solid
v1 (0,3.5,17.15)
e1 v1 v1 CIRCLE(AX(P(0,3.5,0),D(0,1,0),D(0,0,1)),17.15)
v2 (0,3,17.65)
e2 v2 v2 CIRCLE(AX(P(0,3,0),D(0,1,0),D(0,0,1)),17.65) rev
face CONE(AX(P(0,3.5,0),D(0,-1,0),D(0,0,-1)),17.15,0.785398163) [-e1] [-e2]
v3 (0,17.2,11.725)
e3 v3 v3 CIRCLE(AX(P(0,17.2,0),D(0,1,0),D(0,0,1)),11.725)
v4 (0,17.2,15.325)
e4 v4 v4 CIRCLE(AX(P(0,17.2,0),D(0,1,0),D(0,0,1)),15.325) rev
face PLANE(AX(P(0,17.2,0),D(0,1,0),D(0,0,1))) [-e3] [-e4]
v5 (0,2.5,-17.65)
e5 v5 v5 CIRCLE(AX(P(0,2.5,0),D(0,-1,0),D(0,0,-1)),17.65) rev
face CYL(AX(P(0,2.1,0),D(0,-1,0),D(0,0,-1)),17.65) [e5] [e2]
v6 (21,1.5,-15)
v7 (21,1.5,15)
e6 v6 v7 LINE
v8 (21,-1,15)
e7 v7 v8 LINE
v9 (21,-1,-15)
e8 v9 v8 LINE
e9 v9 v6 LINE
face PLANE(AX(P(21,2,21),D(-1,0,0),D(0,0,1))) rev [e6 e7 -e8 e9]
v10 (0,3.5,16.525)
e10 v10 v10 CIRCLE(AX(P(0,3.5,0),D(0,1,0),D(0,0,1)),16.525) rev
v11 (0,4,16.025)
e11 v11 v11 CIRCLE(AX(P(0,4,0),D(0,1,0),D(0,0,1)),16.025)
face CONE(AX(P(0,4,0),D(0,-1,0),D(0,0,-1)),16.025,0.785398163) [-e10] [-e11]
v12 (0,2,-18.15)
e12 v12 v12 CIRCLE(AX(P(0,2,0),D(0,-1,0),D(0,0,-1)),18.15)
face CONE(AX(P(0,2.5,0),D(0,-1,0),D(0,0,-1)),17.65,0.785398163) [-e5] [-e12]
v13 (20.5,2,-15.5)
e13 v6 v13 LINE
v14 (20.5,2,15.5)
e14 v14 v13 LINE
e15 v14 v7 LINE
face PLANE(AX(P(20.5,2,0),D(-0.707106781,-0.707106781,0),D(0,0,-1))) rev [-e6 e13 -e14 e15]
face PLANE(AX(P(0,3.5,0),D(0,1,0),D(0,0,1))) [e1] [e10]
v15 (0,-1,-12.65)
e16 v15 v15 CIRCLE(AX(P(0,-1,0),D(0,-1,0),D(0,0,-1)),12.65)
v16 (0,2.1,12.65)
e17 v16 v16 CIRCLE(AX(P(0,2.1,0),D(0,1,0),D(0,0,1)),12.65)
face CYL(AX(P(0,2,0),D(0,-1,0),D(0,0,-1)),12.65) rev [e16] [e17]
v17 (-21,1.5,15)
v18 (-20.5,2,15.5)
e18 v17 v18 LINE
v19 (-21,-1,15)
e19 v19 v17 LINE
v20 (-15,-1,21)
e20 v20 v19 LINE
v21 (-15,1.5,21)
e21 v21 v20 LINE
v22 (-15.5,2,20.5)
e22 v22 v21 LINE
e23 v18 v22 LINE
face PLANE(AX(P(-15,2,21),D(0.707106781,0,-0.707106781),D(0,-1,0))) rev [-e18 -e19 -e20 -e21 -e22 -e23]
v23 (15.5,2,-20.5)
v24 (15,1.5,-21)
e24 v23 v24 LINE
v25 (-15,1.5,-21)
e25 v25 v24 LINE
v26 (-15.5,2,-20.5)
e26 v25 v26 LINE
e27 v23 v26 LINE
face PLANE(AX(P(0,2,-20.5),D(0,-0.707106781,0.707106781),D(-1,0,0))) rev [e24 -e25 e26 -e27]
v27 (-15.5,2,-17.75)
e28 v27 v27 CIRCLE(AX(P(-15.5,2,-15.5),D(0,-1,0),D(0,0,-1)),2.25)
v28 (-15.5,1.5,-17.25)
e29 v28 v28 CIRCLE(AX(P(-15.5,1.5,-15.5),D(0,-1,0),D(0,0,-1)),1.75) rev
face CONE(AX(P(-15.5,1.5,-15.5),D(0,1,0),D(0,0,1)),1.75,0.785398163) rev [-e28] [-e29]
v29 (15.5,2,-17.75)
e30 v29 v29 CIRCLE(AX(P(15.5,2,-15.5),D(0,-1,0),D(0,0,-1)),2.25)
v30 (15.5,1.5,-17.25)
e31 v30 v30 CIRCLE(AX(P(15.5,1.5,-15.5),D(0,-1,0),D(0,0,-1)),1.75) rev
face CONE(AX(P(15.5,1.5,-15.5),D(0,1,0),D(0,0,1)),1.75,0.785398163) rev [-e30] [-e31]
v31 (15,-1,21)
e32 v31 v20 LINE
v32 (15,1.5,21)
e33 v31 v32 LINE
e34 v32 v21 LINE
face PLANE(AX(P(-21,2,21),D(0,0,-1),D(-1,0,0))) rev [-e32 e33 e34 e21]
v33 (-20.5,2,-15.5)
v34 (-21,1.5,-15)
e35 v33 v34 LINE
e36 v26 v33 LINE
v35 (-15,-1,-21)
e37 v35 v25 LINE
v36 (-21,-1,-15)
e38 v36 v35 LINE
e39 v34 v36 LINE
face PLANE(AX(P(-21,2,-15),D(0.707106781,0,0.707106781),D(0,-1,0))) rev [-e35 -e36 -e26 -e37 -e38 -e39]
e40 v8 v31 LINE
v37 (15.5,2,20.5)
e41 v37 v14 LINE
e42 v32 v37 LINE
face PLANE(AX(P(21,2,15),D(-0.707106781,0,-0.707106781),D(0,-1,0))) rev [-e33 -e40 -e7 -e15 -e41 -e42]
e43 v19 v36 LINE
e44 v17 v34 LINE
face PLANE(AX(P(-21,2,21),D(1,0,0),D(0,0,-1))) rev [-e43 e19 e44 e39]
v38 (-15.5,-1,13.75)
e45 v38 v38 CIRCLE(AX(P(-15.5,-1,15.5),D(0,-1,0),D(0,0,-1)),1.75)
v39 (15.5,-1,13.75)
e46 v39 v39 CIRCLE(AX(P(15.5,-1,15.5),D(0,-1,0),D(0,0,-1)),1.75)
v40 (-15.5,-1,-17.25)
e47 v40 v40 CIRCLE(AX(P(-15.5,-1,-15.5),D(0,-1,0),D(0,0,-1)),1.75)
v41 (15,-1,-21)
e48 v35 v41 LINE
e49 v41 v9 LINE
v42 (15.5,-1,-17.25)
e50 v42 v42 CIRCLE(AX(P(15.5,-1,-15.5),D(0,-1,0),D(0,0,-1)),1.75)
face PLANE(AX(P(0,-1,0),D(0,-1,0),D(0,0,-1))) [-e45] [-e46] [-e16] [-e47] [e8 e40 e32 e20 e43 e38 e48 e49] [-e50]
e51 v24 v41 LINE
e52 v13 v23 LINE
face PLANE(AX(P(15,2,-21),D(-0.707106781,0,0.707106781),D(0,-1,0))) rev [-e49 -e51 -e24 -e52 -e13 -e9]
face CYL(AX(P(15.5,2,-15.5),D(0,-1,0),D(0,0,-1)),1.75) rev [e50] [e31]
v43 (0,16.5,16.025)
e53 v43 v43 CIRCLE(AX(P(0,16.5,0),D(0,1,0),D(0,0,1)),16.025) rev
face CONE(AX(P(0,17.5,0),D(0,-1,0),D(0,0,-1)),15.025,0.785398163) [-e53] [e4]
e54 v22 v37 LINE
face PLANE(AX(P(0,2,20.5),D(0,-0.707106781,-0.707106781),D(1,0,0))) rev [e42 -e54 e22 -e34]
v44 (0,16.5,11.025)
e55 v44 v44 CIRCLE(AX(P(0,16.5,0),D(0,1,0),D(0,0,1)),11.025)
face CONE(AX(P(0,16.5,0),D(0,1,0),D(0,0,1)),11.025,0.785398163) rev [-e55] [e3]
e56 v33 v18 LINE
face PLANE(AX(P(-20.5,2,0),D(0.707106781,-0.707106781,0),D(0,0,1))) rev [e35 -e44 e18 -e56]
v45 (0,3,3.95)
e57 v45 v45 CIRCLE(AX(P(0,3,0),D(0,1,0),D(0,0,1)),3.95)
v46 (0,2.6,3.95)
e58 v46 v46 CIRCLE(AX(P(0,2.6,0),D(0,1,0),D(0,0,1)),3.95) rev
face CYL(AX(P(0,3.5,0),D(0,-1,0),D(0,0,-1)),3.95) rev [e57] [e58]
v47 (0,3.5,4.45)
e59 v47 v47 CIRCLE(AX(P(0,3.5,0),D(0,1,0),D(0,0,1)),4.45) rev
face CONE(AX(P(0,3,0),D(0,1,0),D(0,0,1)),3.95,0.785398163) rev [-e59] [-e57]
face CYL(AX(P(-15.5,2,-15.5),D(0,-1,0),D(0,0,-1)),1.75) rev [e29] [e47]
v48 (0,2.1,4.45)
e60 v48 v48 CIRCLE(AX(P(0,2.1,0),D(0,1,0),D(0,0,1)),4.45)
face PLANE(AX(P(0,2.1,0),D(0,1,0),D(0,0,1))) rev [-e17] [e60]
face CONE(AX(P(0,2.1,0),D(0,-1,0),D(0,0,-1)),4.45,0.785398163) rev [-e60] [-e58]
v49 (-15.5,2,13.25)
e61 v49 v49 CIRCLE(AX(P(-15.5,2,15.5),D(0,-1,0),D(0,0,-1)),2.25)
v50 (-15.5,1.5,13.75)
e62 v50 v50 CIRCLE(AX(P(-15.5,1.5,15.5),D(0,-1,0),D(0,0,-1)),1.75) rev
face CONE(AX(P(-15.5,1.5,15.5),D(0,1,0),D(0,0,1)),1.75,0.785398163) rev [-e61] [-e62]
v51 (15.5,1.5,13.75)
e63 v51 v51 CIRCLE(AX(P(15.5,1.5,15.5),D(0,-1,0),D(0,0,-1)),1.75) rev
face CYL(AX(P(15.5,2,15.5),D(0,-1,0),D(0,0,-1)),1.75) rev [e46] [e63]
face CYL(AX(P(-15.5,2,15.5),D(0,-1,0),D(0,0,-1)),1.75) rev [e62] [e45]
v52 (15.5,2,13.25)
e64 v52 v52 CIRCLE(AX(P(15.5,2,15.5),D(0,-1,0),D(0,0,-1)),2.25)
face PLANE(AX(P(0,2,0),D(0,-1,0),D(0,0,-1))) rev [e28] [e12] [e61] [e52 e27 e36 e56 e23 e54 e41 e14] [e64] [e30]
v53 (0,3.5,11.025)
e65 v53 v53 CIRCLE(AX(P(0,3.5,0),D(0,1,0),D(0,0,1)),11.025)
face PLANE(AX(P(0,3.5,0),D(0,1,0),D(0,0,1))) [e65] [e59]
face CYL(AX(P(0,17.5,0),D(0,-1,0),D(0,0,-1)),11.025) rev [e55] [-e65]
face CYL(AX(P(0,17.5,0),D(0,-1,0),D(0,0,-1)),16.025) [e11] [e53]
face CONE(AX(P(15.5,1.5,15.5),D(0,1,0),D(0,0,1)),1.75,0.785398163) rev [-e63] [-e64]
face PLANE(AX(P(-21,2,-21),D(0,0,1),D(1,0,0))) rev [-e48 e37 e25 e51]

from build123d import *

# Parameters (mm, degrees)
SKETCH_1_W          = 42
SKETCH_1_H          = 42
SKETCH_1_R          = 12.65
SKETCH_1_R_2        = 1.75
EXTRUDE_1_DEPTH     = 2
SKETCH_2_R          = 17.65
SKETCH_2_R_2        = 12.65
EXTRUDE_2_DEPTH     = 0.1
SKETCH_3_R          = 17.65
SKETCH_3_R_2        = 12.65
SKETCH_3_R_3        = 11.025
SKETCH_3_R_4        = 3.95
EXTRUDE_3_DEPTH     = 1.4
SKETCH_4_R          = 16.025
SKETCH_4_R_2        = 11.025
EXTRUDE_4_DEPTH     = 14
CHAMFER_2_SIZE      = 0.5
CHAMFER_3_SIZE      = 1
CHAMFER_4_SIZE      = 6
SKETCH_5_W          = 78.516665661
SKETCH_5_H          = 56.486058674
CUT_EXTRUDE_1_DEPTH = 0.3
EXTRUDE_START       = 1
SKETCH_7_R          = 1.75
SKETCH_7_R_2        = 12.65
EXTRUDE_5_DEPTH     = 1


with BuildPart() as part:
    # 草图1 → 凸台-拉伸1 (new body)
    with BuildSketch(Plane(origin=(0, 0, 0), x_dir=(1, 0, 0), z_dir=(0, 1, 0))):
        Rectangle(SKETCH_1_W, SKETCH_1_H)
        with Locations(Location((0, 0, 0), (0, 0, 270))):
            Circle(SKETCH_1_R, mode=Mode.SUBTRACT)
        with Locations(Location((-15.5, 15.5, 0), (0, 0, 270))):
            Circle(SKETCH_1_R_2, mode=Mode.SUBTRACT)
        with Locations(Location((15.5, 15.5, 0), (0, 0, 270))):
            Circle(SKETCH_1_R_2, mode=Mode.SUBTRACT)
        with Locations(Location((15.5, -15.5, 0), (0, 0, 270))):
            Circle(SKETCH_1_R_2, mode=Mode.SUBTRACT)
        with Locations(Location((-15.5, -15.5, 0), (0, 0, 270))):
            Circle(SKETCH_1_R_2, mode=Mode.SUBTRACT)
    extrude(amount=EXTRUDE_1_DEPTH)

    # 草图2 → 凸台-拉伸2 (add)
    with BuildSketch(Plane(origin=(0, 2, 0), x_dir=(1, 0, 0), z_dir=(0, 1, 0))):
        with Locations(Location((0, 0, 0), (0, 0, 270))):
            Circle(SKETCH_2_R)
        with Locations(Location((0, 0, 0), (0, 0, 270))):
            Circle(SKETCH_2_R_2, mode=Mode.SUBTRACT)
    extrude(amount=EXTRUDE_2_DEPTH)

    # 草图3 → 凸台-拉伸3 (add)
    # profile 1 of 3: a face of its own
    with BuildSketch(Plane(origin=(0, 2.1, 0), x_dir=(1, 0, 0), z_dir=(0, 1, 0))):
        with Locations(Location((0, 0, 0), (0, 0, 270))):
            Circle(SKETCH_3_R)
        with Locations(Location((0, 0, 0), (0, 0, 270))):
            Circle(SKETCH_3_R_2, mode=Mode.SUBTRACT)
    # profile 2 of 3: a face of its own
    with BuildSketch(Plane(origin=(0, 2.1, 0), x_dir=(1, 0, 0), z_dir=(0, 1, 0))):
        with Locations(Location((0, 0, 0), (0, 0, 270))):
            Circle(SKETCH_3_R_2)
        Circle(SKETCH_3_R_3, mode=Mode.SUBTRACT)
    # profile 3 of 3: a face of its own
    with BuildSketch(Plane(origin=(0, 2.1, 0), x_dir=(1, 0, 0), z_dir=(0, 1, 0))):
        Circle(SKETCH_3_R_3)
        with Locations(Location((0, 0, 0), (0, 0, 270))):
            Circle(SKETCH_3_R_4, mode=Mode.SUBTRACT)
    extrude(amount=EXTRUDE_3_DEPTH)

    # 草图4 → 凸台-拉伸4 (add)
    with BuildSketch(Plane(origin=(0, 3.5, 0), x_dir=(1, 0, 0), z_dir=(0, 1, 0))):
        with Locations(Location((0, 0, 0), (0, 0, 270))):
            Circle(SKETCH_4_R)
        with Locations(Location((0, 0, 0), (0, 0, 270))):
            Circle(SKETCH_4_R_2, mode=Mode.SUBTRACT)
    extrude(amount=EXTRUDE_4_DEPTH)

    # 倒角2
    chamfer_2_edges = [part.edges().sort_by_distance(p)[0] for p in [
        (-21, 2, 0),
        (-15.5, 2, -17.25),
        (0, 2, 21),
        (15.5, 2, -17.25),
        (15.5, 2, 13.75),
        (-15.5, 2, 13.75),
        (0, 2, -17.65),
        (0, 2.1, -3.95),
        (0, 3.5, -3.95),
        (0, 3.5, -17.65),
        (0, 3.5, -16.025),
        (21, 2, 0),
        (0, 2, -21),
    ]]
    chamfer(chamfer_2_edges, length=CHAMFER_2_SIZE)

    # 倒角3
    chamfer_3_edges = [part.edges().sort_by_distance(p)[0] for p in [
        (0, 17.5, -11.025),
        (0, 17.5, -16.025),
    ]]
    chamfer(chamfer_3_edges, length=CHAMFER_3_SIZE)

    # 倒角4
    # the kernel refuses this chamfer: 6 mm, written as the material it takes off along each edge
    with BuildSketch(Plane(origin=(-21, -15.430097928, -21), x_dir=(-0.0274958766105862, 0, 0.9996219169112968), z_dir=(0, 1, 0)), Plane(origin=(21, -15.430097928, -21), x_dir=(-0.9996219169112969, 0, -0.027495876610586202), z_dir=(0, 1, 0))) as chamfer_4_piece_1:
        Polygon((CHAMFER_4_SIZE * 0.999621916911, CHAMFER_4_SIZE * 0.0274958766106), (-CHAMFER_4_SIZE * 0.0274958766106, CHAMFER_4_SIZE * 0.999621916911), (0, 0), align=None)
    extrude(amount=32.360195856, mode=Mode.SUBTRACT)
    with BuildSketch(Plane(origin=(-21, -15.430097928, 21), x_dir=(-0.0274958766105862, 0, -0.9996219169112968), z_dir=(0, 1, 0)), Plane(origin=(21, -15.430097928, 21), x_dir=(-0.9996219169112969, 0, 0.027495876610586202), z_dir=(0, 1, 0))) as chamfer_4_piece_2:
        Polygon((CHAMFER_4_SIZE * 0.999621916911, -CHAMFER_4_SIZE * 0.0274958766106), (-CHAMFER_4_SIZE * 0.0274958766106, -CHAMFER_4_SIZE * 0.999621916911), (0, 0), align=None)
    extrude(amount=32.360195856, mode=Mode.SUBTRACT)

    # 草图5 → 切除-拉伸1 (cut)
    with BuildSketch(Plane(origin=(0, 17.5, 0), x_dir=(1, 0, 0), z_dir=(0, 1, 0))):
        with Locations((8.405042003, -1.618362125)):
            Rectangle(SKETCH_5_W, SKETCH_5_H)
    extrude(amount=-CUT_EXTRUDE_1_DEPTH, mode=Mode.SUBTRACT)

    # 草图7 → 凸台-拉伸5 (add)
    with BuildSketch(Plane.XZ.offset(EXTRUDE_START)):
        Polygon((-21, 15), (-21, -15), (-15, -21), (15, -21), (21, -15), (21, 15), (15, 21), (-15, 21), align=None)
        with Locations(Location((15.5, 15.5, 0), (0, 0, 270))):
            Circle(SKETCH_7_R, mode=Mode.SUBTRACT)
        with Locations(Location((-15.5, 15.5, 0), (0, 0, 270))):
            Circle(SKETCH_7_R, mode=Mode.SUBTRACT)
        with Locations(Location((0, 0, 0), (0, 0, 270))):
            Circle(SKETCH_7_R_2, mode=Mode.SUBTRACT)
        with Locations(Location((15.5, -15.5, 0), (0, 0, 270))):
            Circle(SKETCH_7_R, mode=Mode.SUBTRACT)
        with Locations(Location((-15.5, -15.5, 0), (0, 0, 270))):
            Circle(SKETCH_7_R, mode=Mode.SUBTRACT)
    extrude(amount=-EXTRUDE_5_DEPTH)


solid = part.part
